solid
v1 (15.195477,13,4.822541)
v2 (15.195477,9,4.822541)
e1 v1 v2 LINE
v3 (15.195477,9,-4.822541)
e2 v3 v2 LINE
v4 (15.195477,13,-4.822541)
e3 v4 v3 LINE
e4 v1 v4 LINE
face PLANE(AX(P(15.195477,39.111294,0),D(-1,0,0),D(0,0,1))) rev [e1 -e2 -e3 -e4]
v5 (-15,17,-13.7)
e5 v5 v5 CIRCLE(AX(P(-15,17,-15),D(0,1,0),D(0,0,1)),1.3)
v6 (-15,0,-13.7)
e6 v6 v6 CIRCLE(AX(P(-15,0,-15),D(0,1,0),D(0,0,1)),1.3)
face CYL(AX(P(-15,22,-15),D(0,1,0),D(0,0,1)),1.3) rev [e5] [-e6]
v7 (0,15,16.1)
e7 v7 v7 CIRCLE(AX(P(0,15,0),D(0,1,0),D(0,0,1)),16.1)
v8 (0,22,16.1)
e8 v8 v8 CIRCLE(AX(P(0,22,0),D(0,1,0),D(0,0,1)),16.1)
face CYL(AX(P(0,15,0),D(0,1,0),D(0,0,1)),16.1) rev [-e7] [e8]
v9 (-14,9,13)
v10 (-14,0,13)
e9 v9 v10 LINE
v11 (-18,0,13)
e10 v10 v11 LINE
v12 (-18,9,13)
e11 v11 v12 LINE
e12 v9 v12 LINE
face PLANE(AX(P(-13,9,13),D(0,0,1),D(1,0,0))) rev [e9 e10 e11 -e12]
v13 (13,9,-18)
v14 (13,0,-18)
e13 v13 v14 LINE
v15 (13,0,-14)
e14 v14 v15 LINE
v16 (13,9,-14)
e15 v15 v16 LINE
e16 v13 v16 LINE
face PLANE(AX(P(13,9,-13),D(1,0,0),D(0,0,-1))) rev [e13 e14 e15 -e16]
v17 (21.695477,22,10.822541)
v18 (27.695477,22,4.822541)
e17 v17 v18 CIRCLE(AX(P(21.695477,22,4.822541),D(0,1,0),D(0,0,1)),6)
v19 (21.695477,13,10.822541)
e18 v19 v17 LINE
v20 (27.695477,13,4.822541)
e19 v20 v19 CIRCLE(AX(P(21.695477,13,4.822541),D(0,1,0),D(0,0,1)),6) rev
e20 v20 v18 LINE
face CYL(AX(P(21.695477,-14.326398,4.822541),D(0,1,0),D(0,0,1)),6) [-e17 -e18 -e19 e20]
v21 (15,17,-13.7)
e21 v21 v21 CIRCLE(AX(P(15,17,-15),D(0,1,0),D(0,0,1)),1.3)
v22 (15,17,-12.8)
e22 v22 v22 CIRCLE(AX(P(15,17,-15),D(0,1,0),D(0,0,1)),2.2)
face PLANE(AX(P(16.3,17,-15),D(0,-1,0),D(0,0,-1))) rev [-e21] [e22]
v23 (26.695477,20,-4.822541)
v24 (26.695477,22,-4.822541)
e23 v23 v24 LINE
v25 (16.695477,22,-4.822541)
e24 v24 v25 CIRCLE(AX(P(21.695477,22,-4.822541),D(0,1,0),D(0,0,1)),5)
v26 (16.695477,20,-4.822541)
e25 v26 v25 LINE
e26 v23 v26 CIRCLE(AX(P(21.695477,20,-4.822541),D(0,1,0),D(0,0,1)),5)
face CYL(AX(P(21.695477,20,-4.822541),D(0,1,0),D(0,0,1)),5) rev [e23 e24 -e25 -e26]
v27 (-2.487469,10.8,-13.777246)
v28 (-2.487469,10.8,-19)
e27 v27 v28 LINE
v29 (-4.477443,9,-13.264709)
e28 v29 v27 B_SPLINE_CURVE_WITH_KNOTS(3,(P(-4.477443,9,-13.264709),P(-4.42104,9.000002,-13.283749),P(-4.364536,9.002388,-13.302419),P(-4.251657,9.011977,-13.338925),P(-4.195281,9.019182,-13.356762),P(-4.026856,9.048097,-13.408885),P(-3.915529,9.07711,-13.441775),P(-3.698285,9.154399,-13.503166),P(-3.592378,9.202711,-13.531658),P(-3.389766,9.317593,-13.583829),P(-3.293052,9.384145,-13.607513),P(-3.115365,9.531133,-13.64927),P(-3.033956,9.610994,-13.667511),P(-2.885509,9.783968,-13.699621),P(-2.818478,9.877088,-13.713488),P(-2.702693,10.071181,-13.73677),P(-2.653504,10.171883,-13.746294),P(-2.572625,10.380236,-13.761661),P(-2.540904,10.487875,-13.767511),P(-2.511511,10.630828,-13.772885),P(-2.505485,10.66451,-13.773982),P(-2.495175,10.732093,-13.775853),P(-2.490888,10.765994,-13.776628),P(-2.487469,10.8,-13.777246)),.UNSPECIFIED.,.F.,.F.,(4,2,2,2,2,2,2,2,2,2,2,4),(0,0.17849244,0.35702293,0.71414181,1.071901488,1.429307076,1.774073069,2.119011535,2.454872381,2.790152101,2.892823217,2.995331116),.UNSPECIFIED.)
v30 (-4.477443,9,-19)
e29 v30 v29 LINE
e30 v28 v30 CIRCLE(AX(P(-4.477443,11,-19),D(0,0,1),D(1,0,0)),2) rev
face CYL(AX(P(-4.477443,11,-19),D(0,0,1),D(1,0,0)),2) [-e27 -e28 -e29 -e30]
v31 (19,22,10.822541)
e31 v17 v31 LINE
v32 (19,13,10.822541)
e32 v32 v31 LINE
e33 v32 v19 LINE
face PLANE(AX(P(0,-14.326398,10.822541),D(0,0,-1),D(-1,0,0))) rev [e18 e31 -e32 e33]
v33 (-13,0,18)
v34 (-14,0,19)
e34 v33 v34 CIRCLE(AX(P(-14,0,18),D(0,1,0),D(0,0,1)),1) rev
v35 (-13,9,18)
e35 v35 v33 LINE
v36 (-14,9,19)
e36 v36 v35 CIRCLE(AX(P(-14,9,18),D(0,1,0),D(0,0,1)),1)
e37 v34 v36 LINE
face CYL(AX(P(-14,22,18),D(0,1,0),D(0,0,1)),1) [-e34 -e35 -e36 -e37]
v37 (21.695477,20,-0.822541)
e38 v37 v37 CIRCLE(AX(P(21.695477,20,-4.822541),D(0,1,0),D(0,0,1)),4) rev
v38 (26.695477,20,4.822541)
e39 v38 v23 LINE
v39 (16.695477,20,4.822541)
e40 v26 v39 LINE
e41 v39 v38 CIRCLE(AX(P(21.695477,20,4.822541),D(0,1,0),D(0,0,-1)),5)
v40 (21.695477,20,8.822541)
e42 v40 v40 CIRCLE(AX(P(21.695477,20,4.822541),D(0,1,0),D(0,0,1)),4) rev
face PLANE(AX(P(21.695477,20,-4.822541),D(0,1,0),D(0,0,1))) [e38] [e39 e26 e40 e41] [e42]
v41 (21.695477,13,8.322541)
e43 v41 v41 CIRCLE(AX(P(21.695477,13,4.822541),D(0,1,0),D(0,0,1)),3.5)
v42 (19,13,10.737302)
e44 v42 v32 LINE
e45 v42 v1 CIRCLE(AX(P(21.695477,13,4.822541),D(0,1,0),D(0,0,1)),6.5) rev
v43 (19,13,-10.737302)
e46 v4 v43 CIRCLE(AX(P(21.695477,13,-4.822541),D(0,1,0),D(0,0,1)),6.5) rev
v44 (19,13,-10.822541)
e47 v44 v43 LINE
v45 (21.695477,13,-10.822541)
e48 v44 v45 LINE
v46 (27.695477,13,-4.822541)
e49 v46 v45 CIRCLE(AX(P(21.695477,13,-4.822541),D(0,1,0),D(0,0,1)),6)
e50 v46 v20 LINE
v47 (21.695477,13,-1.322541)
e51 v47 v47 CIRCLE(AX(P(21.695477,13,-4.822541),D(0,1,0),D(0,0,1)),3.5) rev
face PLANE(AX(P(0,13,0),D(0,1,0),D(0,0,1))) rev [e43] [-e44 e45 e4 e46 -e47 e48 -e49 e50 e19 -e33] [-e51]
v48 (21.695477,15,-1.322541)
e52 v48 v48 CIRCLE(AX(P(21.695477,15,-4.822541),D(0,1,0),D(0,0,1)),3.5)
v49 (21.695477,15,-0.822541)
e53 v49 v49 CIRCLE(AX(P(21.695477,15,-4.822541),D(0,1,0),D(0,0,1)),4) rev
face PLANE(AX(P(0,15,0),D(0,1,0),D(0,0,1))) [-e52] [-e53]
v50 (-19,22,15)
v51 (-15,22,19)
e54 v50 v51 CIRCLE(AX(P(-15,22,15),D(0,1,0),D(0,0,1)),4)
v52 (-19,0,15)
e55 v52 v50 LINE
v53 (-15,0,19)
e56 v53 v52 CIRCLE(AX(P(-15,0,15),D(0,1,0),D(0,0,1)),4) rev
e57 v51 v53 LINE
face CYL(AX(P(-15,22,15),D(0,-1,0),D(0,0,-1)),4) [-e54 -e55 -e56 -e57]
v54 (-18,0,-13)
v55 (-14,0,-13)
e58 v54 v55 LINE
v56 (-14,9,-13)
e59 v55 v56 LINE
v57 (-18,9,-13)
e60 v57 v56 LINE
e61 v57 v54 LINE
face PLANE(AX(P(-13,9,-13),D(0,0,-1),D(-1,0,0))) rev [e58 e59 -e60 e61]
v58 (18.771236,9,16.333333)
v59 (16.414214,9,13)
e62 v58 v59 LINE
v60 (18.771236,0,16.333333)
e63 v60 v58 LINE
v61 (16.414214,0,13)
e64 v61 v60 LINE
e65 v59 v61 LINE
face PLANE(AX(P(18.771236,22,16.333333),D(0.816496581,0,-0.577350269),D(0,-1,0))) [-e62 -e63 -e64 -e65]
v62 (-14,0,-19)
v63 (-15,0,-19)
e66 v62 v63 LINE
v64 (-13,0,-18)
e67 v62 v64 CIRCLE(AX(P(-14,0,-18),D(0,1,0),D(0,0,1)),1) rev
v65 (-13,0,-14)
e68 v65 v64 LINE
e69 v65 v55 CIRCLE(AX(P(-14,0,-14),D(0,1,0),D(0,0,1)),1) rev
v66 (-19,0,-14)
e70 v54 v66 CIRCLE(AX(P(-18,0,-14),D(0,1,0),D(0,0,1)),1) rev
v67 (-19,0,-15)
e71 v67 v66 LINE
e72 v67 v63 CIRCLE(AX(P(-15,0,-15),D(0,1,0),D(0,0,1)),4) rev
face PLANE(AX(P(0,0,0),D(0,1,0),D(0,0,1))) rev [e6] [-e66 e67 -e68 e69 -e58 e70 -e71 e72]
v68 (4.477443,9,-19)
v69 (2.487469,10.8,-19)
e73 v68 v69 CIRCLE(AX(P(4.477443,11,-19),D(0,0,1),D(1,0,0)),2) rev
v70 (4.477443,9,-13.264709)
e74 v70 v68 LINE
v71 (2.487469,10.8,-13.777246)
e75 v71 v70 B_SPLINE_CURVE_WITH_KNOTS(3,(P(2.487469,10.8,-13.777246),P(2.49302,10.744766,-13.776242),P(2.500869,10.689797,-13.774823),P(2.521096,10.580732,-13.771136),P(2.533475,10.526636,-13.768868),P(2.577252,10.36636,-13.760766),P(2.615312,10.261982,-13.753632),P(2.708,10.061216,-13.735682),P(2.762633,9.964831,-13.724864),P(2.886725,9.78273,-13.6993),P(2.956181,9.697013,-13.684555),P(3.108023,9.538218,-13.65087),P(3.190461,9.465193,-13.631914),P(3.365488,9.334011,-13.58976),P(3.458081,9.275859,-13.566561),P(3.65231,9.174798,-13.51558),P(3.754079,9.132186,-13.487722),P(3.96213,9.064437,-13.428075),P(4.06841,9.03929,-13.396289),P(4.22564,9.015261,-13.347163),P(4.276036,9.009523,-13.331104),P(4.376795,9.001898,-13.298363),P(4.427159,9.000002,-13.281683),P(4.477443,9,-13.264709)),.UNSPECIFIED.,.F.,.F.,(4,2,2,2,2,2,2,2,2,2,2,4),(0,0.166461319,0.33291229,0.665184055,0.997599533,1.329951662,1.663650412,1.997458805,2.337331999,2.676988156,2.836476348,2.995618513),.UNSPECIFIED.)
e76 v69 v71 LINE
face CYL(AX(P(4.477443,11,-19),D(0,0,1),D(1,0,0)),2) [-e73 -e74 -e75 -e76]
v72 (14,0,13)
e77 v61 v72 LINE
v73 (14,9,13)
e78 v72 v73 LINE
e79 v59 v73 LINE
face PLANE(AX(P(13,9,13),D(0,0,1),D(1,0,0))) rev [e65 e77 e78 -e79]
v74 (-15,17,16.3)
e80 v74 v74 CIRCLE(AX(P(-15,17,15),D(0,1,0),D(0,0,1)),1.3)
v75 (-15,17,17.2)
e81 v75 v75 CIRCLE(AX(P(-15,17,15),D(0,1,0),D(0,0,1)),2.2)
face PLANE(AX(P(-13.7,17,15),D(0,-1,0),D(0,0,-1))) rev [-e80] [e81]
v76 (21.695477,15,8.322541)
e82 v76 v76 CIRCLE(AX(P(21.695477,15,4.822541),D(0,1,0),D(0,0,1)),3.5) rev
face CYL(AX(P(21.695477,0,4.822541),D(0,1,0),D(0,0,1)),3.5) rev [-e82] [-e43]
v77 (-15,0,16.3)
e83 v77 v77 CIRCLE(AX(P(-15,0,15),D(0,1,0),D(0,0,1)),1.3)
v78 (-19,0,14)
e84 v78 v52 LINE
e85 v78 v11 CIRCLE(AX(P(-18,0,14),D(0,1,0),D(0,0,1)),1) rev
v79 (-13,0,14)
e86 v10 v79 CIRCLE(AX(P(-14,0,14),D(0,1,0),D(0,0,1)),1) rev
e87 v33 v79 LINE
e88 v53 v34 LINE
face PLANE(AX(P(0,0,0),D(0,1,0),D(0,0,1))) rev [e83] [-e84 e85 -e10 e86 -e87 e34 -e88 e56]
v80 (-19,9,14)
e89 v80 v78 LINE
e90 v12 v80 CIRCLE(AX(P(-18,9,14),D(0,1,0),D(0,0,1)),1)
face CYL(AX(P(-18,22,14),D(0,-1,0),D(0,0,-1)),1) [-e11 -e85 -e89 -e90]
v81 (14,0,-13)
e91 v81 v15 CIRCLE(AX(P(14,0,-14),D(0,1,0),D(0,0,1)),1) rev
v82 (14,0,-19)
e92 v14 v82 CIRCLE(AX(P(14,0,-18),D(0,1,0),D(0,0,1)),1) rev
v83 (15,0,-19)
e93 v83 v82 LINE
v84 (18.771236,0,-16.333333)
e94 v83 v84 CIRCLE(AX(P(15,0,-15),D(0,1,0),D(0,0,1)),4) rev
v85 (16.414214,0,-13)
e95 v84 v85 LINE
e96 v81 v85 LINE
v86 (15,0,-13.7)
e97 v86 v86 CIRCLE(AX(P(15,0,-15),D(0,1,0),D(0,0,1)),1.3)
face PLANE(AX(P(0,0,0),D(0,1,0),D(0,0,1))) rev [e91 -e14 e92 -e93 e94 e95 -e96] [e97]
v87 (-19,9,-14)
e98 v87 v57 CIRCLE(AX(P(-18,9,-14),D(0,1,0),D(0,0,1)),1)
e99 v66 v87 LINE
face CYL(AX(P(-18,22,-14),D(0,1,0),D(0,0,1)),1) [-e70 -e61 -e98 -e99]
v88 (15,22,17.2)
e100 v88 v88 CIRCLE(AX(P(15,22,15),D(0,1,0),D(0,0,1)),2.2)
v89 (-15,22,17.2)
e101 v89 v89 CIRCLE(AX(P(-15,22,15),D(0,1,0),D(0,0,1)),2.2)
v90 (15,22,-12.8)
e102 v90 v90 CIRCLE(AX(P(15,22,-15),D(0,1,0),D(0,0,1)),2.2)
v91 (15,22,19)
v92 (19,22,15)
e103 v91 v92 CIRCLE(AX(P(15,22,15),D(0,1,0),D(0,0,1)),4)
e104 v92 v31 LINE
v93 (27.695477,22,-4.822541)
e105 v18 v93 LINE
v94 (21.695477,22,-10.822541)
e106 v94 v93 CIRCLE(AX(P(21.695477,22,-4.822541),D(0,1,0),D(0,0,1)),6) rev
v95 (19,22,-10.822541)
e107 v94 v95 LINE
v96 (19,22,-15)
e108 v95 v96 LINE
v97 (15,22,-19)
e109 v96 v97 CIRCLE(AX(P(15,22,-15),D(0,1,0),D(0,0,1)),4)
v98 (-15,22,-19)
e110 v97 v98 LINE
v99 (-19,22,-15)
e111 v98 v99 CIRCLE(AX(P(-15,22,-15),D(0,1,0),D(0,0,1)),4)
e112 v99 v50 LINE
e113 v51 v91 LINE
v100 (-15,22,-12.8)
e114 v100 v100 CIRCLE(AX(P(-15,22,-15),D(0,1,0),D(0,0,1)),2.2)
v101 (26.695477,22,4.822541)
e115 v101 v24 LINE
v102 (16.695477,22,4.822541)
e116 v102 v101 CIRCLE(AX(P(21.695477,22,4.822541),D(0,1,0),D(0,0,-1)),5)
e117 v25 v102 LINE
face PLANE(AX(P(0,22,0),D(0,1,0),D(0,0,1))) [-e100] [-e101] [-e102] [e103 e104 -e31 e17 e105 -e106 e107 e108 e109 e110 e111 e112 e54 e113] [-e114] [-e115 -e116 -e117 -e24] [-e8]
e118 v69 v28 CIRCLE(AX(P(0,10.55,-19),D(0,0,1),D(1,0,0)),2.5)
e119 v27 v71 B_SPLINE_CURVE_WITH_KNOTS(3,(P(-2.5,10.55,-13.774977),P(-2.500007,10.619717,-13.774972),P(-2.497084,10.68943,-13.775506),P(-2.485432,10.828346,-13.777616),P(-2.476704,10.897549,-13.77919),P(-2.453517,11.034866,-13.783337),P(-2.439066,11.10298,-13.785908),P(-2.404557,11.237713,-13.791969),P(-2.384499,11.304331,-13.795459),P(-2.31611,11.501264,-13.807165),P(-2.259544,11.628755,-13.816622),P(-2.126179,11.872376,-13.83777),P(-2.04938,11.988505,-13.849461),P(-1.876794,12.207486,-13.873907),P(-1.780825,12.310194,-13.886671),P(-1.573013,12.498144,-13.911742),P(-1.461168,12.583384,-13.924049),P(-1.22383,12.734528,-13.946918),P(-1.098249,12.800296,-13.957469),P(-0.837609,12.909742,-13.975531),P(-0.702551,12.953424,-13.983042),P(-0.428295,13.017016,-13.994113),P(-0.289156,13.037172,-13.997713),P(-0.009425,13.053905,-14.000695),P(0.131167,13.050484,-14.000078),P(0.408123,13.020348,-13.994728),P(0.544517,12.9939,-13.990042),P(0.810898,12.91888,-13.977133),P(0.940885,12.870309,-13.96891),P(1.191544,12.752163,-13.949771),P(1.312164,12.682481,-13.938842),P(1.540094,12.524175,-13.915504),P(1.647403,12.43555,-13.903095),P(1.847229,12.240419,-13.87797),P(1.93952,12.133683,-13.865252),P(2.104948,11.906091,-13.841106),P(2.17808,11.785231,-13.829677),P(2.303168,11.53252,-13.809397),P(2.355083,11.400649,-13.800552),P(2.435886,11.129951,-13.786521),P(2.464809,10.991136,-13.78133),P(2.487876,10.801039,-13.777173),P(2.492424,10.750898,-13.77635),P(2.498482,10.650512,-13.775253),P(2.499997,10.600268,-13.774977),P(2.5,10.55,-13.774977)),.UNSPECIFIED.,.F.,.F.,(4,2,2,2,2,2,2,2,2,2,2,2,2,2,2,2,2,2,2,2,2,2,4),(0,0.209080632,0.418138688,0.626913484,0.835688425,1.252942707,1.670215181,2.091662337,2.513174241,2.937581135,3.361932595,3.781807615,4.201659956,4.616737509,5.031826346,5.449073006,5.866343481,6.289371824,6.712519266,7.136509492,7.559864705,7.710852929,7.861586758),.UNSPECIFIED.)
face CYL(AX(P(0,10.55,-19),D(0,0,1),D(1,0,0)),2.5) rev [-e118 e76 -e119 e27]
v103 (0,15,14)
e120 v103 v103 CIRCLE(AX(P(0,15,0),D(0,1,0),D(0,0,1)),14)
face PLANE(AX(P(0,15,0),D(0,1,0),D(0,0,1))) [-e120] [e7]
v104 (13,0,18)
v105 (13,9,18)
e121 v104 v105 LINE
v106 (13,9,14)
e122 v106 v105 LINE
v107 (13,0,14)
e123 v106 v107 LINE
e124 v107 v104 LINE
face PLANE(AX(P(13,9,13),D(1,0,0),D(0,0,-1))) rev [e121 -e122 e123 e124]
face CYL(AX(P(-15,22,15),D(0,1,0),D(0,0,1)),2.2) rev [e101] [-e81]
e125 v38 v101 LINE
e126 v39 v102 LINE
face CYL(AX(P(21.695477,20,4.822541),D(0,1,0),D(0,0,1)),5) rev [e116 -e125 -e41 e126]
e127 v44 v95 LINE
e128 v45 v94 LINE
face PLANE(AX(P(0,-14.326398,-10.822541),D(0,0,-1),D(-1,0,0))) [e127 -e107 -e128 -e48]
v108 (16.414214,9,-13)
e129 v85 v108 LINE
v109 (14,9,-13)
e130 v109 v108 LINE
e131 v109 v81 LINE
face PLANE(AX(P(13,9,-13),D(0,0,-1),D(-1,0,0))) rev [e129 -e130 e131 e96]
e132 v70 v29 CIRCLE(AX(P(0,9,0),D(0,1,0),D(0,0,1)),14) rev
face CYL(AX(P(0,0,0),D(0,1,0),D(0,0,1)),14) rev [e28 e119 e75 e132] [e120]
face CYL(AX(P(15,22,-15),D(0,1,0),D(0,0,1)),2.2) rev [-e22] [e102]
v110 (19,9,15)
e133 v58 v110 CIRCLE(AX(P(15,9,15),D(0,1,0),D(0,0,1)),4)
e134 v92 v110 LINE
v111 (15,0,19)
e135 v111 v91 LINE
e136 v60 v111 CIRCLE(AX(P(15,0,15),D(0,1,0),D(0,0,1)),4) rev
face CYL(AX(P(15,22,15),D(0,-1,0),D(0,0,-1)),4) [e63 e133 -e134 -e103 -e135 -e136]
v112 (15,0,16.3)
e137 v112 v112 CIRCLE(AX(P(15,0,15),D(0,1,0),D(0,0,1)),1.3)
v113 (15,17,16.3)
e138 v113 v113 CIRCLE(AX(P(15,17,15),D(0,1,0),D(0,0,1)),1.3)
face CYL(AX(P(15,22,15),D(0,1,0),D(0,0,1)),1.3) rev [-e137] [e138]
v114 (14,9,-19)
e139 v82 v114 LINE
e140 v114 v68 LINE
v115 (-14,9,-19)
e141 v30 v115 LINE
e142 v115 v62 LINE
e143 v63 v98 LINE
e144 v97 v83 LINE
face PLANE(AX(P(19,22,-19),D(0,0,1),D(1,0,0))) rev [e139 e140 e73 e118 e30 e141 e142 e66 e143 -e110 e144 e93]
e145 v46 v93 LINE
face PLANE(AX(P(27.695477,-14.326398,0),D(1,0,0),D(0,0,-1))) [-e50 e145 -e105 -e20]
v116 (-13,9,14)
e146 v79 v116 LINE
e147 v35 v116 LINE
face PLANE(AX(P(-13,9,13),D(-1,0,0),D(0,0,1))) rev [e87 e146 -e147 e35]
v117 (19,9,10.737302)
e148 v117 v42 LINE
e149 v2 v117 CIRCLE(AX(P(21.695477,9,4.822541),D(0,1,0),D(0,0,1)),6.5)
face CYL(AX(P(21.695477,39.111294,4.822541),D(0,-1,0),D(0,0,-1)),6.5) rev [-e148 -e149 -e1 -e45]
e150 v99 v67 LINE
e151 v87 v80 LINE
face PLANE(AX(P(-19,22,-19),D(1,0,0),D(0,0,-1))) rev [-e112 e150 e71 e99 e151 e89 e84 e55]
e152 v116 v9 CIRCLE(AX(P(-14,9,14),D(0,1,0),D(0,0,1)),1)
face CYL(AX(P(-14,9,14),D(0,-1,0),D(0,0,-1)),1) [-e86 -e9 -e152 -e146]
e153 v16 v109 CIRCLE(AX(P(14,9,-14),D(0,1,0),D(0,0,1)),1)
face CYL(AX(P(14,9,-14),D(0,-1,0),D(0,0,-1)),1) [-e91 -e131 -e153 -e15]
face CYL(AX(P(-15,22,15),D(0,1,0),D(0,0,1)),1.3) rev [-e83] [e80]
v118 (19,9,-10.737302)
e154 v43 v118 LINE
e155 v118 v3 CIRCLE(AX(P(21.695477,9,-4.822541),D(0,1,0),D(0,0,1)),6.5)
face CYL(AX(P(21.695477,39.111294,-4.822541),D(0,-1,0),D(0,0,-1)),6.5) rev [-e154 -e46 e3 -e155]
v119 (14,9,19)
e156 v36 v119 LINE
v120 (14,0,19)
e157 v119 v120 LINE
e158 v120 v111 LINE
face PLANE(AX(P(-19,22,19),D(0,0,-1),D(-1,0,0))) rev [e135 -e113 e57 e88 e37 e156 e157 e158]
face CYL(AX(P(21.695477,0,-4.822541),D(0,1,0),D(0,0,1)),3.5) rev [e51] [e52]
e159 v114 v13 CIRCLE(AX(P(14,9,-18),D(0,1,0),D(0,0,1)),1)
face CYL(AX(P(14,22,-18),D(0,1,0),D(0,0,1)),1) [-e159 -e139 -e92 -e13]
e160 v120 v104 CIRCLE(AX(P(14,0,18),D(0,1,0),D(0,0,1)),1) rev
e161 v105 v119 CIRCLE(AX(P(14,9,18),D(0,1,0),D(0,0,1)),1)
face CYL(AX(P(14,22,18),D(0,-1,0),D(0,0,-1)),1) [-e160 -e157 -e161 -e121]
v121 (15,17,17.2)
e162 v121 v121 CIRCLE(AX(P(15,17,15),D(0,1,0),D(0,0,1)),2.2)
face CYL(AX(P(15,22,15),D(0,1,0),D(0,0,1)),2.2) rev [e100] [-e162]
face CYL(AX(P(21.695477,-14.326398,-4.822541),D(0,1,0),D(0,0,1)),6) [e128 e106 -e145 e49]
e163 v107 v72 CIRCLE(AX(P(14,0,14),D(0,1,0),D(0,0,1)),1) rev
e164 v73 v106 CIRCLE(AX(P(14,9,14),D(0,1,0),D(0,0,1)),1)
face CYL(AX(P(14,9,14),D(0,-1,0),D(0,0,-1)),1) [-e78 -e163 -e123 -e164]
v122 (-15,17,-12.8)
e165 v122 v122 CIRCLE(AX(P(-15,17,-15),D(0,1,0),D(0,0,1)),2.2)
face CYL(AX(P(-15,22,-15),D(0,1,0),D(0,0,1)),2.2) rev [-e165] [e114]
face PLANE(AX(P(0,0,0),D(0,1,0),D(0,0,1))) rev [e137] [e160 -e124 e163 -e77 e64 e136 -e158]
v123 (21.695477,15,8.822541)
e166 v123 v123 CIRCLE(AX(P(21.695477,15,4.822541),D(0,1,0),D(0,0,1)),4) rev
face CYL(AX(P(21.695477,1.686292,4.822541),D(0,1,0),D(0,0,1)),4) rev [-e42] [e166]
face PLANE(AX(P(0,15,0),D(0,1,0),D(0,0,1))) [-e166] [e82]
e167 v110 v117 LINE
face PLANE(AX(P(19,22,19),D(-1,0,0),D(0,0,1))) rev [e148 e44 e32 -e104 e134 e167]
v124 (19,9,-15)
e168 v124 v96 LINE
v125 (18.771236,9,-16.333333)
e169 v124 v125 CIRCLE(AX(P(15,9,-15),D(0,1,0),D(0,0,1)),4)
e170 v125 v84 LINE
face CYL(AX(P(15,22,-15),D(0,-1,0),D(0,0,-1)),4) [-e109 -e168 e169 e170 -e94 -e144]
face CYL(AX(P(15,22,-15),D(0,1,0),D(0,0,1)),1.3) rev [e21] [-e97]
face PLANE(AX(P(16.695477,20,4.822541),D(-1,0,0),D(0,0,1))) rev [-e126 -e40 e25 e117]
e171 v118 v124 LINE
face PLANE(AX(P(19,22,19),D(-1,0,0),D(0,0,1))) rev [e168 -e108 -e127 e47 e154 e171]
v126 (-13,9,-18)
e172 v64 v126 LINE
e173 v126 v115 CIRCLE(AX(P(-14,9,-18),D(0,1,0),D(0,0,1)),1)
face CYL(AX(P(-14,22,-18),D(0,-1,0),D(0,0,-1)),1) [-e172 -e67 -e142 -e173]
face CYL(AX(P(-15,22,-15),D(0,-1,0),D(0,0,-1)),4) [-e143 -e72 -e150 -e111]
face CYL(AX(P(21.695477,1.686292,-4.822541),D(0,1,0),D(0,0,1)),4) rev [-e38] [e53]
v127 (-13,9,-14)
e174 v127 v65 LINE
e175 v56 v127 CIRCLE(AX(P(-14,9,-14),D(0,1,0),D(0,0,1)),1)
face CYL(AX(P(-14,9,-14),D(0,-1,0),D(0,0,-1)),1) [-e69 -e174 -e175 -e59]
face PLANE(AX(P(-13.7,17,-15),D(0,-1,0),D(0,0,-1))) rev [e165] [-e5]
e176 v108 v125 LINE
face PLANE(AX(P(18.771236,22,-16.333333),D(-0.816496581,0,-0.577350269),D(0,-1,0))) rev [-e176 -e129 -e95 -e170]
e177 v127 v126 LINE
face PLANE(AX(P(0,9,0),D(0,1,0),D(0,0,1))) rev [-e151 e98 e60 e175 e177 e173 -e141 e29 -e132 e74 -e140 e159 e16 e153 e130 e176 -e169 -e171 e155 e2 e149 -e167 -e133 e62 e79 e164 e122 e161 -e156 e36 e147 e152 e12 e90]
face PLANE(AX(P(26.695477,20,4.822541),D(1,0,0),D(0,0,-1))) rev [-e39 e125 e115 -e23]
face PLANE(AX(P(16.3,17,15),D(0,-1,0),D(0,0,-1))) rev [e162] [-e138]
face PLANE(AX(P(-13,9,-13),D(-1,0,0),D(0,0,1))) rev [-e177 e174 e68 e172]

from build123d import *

# Parameters (mm, degrees)
SKETCH1_W                      = 38
SKETCH1_H                      = 38
BOSS_EXTRUDE1_DEPTH            = 22
SKETCH2_R                      = 16.1
CUT_EXTRUDE1_DEPTH             = 7
SKETCH2_3_R                    = 14
CUT_EXTRUDE3_DEPTH             = 35.727510708
FILLET1_R                      = 4
CBORE_FOR_M2_SHCS1_D           = 2.6
CBORE_FOR_M2_SHCS1_CBORE_D     = 4.4
CBORE_FOR_M2_SHCS1_CBORE_DEPTH = 5
CUT_EXTRUDE5_DEPTH             = 9
FILLET2_R                      = 1
CHAMFER1_DEPTH                 = 9
CUT_EXTRUDE6_DEPTH             = 35.727510708
FILLET3_R                      = 2
BOSS_EXTRUDE4_DEPTH            = 9
CUT_EXTRUDE8_DEPTH             = 41.150211222
SKETCH12_R                     = 4
CUT_EXTRUDE9_DEPTH             = 7
SKETCH13_R                     = 6.5
CUT_EXTRUDE11_DEPTH            = 13
CUT_EXTRUDE12_DEPTH            = 2


with BuildPart() as part:
    # Sketch1 → Boss-Extrude1 (new body)
    with BuildSketch(Plane(origin=(0, 0, 0), x_dir=(1, 0, 0), z_dir=(0, 1, 0))):
        Rectangle(SKETCH1_W, SKETCH1_H)
    extrude(amount=BOSS_EXTRUDE1_DEPTH)

    # Sketch2 → Cut-Extrude1 (cut)
    with BuildSketch(Plane(origin=(0, 22, 0), x_dir=(1, 0, 0), z_dir=(0, 1, 0))):
        with Locations(Location((0, 0, 0), (0, 0, 270))):
            Circle(SKETCH2_R)
    extrude(amount=-CUT_EXTRUDE1_DEPTH, mode=Mode.SUBTRACT)

    # Sketch2<3> → Cut-Extrude3 (cut, through all)
    with BuildSketch(Plane(origin=(0, 22, 0), x_dir=(1, 0, 0), z_dir=(0, 1, 0))):
        with Locations(Location((0, 0, 0), (0, 0, 270))):
            Circle(SKETCH2_3_R)
    extrude(amount=-CUT_EXTRUDE3_DEPTH, mode=Mode.SUBTRACT)

    # Fillet1
    fillet1_edges = [part.edges().sort_by_distance(p)[0] for p in [
        (19, 11, 19),
        (-19, 11, 19),
        (-19, 11, -19),
        (19, 11, -19),
    ]]
    fillet(fillet1_edges, radius=FILLET1_R)

    # CBORE for M2 SHCS1 (through all)
    with Locations(Plane(origin=(0, 22, 0), x_dir=(1, 0, 0), z_dir=(0, 1, 0))):
        with Locations((-15, 15), (15, 15), (-15, -15), (15, -15)):
            CounterBoreHole(CBORE_FOR_M2_SHCS1_D / 2, CBORE_FOR_M2_SHCS1_CBORE_D / 2, CBORE_FOR_M2_SHCS1_CBORE_DEPTH)

    # Sketch8 → Cut-Extrude5 (cut)
    with BuildSketch(Plane.XZ):
        Polygon((13, 13), (20, 13), (20, -13), (13, -13), (13, -20), (-13, -20), (-13, -13), (-20, -13), (-20, 13), (-13, 13), (-13, 20), (13, 20), align=None)
    extrude(amount=-CUT_EXTRUDE5_DEPTH, mode=Mode.SUBTRACT)

    # Fillet2
    fillet2_edges = [part.edges().sort_by_distance(p)[0] for p in [
        (13, 4.5, 19),
        (13, 4.5, 13),
        (13, 4.5, -19),
        (13, 4.5, -13),
        (-13, 4.5, -19),
        (-19, 4.5, -13),
        (-13, 4.5, -13),
        (-19, 4.5, 13),
        (-13, 4.5, 19),
        (-13, 4.5, 13),
    ]]
    fillet(fillet2_edges, radius=FILLET2_R)

    # Chamfer1: read off the stored shape, not the designer's step
    # Chamfer1 outline → Chamfer1 (cut)
    with BuildSketch(Plane(origin=(0, 0, 0), x_dir=(1, 0, 0), z_dir=(0, 1, 0))):
        with BuildLine():
            ThreePointArc((19, 15), (18.942394239, 15.676407915), (18.771236167, 16.333333333))
            Line((18.771236167, 16.333333333), (16.414213562, 13))
            Line((16.414213562, 13), (19, 13))
            Line((19, 13), (19, 15))
        make_face()
        with BuildLine():
            Line((19, -15), (19, -13))
            Line((19, -13), (16.414213562, -13))
            Line((16.414213562, -13), (18.771236167, -16.333333333))
            ThreePointArc((18.771236167, -16.333333333), (18.942394239, -15.676407915), (19, -15))
        make_face()
    extrude(amount=CHAMFER1_DEPTH, mode=Mode.SUBTRACT)

    # Sketch10 → Cut-Extrude6 (cut, through all)
    with BuildSketch(Plane.XY):
        with BuildLine():
            Line((2.5, 10.55), (2.5, 0))
            Line((2.5, 0), (-2.5, 0))
            Line((-2.5, 0), (-2.5, 10.55))
            ThreePointArc((-2.5, 10.55), (0, 13.05), (2.5, 10.55))
        make_face()
    extrude(amount=-CUT_EXTRUDE6_DEPTH, mode=Mode.SUBTRACT)

    # Fillet3
    fillet3_edges = [part.edges().sort_by_distance(p)[0] for p in [
        (-2.5, 9, -16.387488657),
        (2.5, 9, -16.387488657),
    ]]
    fillet(fillet3_edges, radius=FILLET3_R)

    # Sketch11 → Boss-Extrude4 (add)
    with BuildSketch(Plane(origin=(0, 22, 0), x_dir=(1, 0, 0), z_dir=(0, 1, 0))):
        with BuildLine():
            Line((19, 7.055118245), (19, 2.589962887))
            ThreePointArc((19, 2.589962887), (22.882033078, 1.529808424), (25.195477121, 4.822540566))
            ThreePointArc((25.195477121, 4.822540566), (22.882033078, 8.115272708), (19, 7.055118245))
        make_face()
        with BuildLine():
            ThreePointArc((19, 7.055118245), (18.195477121, 4.822540566), (19, 2.589962887))
            Line((19, 2.589962887), (19, 7.055118245))
        make_face()
        with BuildLine():
            Line((19, -2.589962887), (19, -7.055118245))
            ThreePointArc((19, -7.055118245), (22.882033078, -8.115272708), (25.195477121, -4.822540566))
            ThreePointArc((25.195477121, -4.822540566), (22.882033078, -1.529808424), (19, -2.589962887))
        make_face()
        with BuildLine():
            ThreePointArc((19, -2.589962887), (18.195477121, -4.822540566), (19, -7.055118245))
            Line((19, -7.055118245), (19, -2.589962887))
        make_face()
        with BuildLine():
            Line((19, -10.822540566), (21.695477121, -10.822540566))
            ThreePointArc((21.695477121, -10.822540566), (25.938117808, -9.065181253), (27.695477121, -4.822540566))
            Line((27.695477121, -4.822540566), (27.695477121, 4.822540566))
            ThreePointArc((27.695477121, 4.822540566), (25.938117808, 9.065181253), (21.695477121, 10.822540566))
            Line((21.695477121, 10.822540566), (19, 10.822540566))
            Line((19, 10.822540566), (19, 7.055118245))
            ThreePointArc((19, 7.055118245), (22.882033078, 8.115272708), (25.195477121, 4.822540566))
            ThreePointArc((25.195477121, 4.822540566), (22.882033078, 1.529808424), (19, 2.589962887))
            Line((19, 2.589962887), (19, -2.589962887))
            ThreePointArc((19, -2.589962887), (22.882033078, -1.529808424), (25.195477121, -4.822540566))
            ThreePointArc((25.195477121, -4.822540566), (22.882033078, -8.115272708), (19, -7.055118245))
            Line((19, -7.055118245), (19, -10.822540566))
        make_face()
    extrude(amount=-BOSS_EXTRUDE4_DEPTH)

    # Sketch11<5> → Cut-Extrude8 (cut, through all)
    with BuildSketch(Plane(origin=(0, 22, 0), x_dir=(1, 0, 0), z_dir=(0, 1, 0))):
        with BuildLine():
            Line((19, 7.055118245), (19, 2.589962887))
            ThreePointArc((19, 2.589962887), (22.882033078, 1.529808424), (25.195477121, 4.822540566))
            ThreePointArc((25.195477121, 4.822540566), (22.882033078, 8.115272708), (19, 7.055118245))
        make_face()
        with BuildLine():
            ThreePointArc((19, 7.055118245), (18.195477121, 4.822540566), (19, 2.589962887))
            Line((19, 2.589962887), (19, 7.055118245))
        make_face()
        with BuildLine():
            Line((19, -2.589962887), (19, -7.055118245))
            ThreePointArc((19, -7.055118245), (22.882033078, -8.115272708), (25.195477121, -4.822540566))
            ThreePointArc((25.195477121, -4.822540566), (22.882033078, -1.529808424), (19, -2.589962887))
        make_face()
        with BuildLine():
            ThreePointArc((19, -2.589962887), (18.195477121, -4.822540566), (19, -7.055118245))
            Line((19, -7.055118245), (19, -2.589962887))
        make_face()
    extrude(amount=-CUT_EXTRUDE8_DEPTH, mode=Mode.SUBTRACT)

    # Sketch12 → Cut-Extrude9 (cut)
    with BuildSketch(Plane(origin=(0, 22, 0), x_dir=(1, 0, 0), z_dir=(0, 1, 0))):
        with Locations(Location((21.695477121, -4.822540566, 0), (0, 0, 270))):
            Circle(SKETCH12_R)
        with Locations(Location((21.695477121, 4.822540566, 0), (0, 0, 270))):
            Circle(SKETCH12_R)
    extrude(amount=-CUT_EXTRUDE9_DEPTH, mode=Mode.SUBTRACT)

    # Sketch13 → Cut-Extrude11 (cut)
    with BuildSketch(Plane.XZ):
        with Locations((21.695477121, -4.822540566)):
            Circle(SKETCH13_R)
        with Locations((21.695477121, 4.822540566)):
            Circle(SKETCH13_R)
        with BuildLine():
            ThreePointArc((17.337369448, 0), (15.755035223, 2.184141418), (15.195477121, 4.822540566))
            Line((15.195477121, 4.822540566), (15.195477121, -4.822540566))
            ThreePointArc((15.195477121, -4.822540566), (15.755035223, -2.184141418), (17.337369448, 0))
        make_face()
    extrude(amount=-CUT_EXTRUDE11_DEPTH, mode=Mode.SUBTRACT)

    # Sketch15 → Cut-Extrude12 (cut)
    with BuildSketch(Plane(origin=(0, 22, 0), x_dir=(1, 0, 0), z_dir=(0, 1, 0))):
        with BuildLine():
            Line((16.695477121, -4.822540566), (16.695477121, 4.822540566))
            ThreePointArc((16.695477121, 4.822540566), (21.695477121, 9.822540566), (26.695477121, 4.822540566))
            Line((26.695477121, 4.822540566), (26.695477121, -4.822540566))
            ThreePointArc((26.695477121, -4.822540566), (21.695477121, -9.822540566), (16.695477121, -4.822540566))
        make_face()
    extrude(amount=-CUT_EXTRUDE12_DEPTH, mode=Mode.SUBTRACT)


solid = part.part
